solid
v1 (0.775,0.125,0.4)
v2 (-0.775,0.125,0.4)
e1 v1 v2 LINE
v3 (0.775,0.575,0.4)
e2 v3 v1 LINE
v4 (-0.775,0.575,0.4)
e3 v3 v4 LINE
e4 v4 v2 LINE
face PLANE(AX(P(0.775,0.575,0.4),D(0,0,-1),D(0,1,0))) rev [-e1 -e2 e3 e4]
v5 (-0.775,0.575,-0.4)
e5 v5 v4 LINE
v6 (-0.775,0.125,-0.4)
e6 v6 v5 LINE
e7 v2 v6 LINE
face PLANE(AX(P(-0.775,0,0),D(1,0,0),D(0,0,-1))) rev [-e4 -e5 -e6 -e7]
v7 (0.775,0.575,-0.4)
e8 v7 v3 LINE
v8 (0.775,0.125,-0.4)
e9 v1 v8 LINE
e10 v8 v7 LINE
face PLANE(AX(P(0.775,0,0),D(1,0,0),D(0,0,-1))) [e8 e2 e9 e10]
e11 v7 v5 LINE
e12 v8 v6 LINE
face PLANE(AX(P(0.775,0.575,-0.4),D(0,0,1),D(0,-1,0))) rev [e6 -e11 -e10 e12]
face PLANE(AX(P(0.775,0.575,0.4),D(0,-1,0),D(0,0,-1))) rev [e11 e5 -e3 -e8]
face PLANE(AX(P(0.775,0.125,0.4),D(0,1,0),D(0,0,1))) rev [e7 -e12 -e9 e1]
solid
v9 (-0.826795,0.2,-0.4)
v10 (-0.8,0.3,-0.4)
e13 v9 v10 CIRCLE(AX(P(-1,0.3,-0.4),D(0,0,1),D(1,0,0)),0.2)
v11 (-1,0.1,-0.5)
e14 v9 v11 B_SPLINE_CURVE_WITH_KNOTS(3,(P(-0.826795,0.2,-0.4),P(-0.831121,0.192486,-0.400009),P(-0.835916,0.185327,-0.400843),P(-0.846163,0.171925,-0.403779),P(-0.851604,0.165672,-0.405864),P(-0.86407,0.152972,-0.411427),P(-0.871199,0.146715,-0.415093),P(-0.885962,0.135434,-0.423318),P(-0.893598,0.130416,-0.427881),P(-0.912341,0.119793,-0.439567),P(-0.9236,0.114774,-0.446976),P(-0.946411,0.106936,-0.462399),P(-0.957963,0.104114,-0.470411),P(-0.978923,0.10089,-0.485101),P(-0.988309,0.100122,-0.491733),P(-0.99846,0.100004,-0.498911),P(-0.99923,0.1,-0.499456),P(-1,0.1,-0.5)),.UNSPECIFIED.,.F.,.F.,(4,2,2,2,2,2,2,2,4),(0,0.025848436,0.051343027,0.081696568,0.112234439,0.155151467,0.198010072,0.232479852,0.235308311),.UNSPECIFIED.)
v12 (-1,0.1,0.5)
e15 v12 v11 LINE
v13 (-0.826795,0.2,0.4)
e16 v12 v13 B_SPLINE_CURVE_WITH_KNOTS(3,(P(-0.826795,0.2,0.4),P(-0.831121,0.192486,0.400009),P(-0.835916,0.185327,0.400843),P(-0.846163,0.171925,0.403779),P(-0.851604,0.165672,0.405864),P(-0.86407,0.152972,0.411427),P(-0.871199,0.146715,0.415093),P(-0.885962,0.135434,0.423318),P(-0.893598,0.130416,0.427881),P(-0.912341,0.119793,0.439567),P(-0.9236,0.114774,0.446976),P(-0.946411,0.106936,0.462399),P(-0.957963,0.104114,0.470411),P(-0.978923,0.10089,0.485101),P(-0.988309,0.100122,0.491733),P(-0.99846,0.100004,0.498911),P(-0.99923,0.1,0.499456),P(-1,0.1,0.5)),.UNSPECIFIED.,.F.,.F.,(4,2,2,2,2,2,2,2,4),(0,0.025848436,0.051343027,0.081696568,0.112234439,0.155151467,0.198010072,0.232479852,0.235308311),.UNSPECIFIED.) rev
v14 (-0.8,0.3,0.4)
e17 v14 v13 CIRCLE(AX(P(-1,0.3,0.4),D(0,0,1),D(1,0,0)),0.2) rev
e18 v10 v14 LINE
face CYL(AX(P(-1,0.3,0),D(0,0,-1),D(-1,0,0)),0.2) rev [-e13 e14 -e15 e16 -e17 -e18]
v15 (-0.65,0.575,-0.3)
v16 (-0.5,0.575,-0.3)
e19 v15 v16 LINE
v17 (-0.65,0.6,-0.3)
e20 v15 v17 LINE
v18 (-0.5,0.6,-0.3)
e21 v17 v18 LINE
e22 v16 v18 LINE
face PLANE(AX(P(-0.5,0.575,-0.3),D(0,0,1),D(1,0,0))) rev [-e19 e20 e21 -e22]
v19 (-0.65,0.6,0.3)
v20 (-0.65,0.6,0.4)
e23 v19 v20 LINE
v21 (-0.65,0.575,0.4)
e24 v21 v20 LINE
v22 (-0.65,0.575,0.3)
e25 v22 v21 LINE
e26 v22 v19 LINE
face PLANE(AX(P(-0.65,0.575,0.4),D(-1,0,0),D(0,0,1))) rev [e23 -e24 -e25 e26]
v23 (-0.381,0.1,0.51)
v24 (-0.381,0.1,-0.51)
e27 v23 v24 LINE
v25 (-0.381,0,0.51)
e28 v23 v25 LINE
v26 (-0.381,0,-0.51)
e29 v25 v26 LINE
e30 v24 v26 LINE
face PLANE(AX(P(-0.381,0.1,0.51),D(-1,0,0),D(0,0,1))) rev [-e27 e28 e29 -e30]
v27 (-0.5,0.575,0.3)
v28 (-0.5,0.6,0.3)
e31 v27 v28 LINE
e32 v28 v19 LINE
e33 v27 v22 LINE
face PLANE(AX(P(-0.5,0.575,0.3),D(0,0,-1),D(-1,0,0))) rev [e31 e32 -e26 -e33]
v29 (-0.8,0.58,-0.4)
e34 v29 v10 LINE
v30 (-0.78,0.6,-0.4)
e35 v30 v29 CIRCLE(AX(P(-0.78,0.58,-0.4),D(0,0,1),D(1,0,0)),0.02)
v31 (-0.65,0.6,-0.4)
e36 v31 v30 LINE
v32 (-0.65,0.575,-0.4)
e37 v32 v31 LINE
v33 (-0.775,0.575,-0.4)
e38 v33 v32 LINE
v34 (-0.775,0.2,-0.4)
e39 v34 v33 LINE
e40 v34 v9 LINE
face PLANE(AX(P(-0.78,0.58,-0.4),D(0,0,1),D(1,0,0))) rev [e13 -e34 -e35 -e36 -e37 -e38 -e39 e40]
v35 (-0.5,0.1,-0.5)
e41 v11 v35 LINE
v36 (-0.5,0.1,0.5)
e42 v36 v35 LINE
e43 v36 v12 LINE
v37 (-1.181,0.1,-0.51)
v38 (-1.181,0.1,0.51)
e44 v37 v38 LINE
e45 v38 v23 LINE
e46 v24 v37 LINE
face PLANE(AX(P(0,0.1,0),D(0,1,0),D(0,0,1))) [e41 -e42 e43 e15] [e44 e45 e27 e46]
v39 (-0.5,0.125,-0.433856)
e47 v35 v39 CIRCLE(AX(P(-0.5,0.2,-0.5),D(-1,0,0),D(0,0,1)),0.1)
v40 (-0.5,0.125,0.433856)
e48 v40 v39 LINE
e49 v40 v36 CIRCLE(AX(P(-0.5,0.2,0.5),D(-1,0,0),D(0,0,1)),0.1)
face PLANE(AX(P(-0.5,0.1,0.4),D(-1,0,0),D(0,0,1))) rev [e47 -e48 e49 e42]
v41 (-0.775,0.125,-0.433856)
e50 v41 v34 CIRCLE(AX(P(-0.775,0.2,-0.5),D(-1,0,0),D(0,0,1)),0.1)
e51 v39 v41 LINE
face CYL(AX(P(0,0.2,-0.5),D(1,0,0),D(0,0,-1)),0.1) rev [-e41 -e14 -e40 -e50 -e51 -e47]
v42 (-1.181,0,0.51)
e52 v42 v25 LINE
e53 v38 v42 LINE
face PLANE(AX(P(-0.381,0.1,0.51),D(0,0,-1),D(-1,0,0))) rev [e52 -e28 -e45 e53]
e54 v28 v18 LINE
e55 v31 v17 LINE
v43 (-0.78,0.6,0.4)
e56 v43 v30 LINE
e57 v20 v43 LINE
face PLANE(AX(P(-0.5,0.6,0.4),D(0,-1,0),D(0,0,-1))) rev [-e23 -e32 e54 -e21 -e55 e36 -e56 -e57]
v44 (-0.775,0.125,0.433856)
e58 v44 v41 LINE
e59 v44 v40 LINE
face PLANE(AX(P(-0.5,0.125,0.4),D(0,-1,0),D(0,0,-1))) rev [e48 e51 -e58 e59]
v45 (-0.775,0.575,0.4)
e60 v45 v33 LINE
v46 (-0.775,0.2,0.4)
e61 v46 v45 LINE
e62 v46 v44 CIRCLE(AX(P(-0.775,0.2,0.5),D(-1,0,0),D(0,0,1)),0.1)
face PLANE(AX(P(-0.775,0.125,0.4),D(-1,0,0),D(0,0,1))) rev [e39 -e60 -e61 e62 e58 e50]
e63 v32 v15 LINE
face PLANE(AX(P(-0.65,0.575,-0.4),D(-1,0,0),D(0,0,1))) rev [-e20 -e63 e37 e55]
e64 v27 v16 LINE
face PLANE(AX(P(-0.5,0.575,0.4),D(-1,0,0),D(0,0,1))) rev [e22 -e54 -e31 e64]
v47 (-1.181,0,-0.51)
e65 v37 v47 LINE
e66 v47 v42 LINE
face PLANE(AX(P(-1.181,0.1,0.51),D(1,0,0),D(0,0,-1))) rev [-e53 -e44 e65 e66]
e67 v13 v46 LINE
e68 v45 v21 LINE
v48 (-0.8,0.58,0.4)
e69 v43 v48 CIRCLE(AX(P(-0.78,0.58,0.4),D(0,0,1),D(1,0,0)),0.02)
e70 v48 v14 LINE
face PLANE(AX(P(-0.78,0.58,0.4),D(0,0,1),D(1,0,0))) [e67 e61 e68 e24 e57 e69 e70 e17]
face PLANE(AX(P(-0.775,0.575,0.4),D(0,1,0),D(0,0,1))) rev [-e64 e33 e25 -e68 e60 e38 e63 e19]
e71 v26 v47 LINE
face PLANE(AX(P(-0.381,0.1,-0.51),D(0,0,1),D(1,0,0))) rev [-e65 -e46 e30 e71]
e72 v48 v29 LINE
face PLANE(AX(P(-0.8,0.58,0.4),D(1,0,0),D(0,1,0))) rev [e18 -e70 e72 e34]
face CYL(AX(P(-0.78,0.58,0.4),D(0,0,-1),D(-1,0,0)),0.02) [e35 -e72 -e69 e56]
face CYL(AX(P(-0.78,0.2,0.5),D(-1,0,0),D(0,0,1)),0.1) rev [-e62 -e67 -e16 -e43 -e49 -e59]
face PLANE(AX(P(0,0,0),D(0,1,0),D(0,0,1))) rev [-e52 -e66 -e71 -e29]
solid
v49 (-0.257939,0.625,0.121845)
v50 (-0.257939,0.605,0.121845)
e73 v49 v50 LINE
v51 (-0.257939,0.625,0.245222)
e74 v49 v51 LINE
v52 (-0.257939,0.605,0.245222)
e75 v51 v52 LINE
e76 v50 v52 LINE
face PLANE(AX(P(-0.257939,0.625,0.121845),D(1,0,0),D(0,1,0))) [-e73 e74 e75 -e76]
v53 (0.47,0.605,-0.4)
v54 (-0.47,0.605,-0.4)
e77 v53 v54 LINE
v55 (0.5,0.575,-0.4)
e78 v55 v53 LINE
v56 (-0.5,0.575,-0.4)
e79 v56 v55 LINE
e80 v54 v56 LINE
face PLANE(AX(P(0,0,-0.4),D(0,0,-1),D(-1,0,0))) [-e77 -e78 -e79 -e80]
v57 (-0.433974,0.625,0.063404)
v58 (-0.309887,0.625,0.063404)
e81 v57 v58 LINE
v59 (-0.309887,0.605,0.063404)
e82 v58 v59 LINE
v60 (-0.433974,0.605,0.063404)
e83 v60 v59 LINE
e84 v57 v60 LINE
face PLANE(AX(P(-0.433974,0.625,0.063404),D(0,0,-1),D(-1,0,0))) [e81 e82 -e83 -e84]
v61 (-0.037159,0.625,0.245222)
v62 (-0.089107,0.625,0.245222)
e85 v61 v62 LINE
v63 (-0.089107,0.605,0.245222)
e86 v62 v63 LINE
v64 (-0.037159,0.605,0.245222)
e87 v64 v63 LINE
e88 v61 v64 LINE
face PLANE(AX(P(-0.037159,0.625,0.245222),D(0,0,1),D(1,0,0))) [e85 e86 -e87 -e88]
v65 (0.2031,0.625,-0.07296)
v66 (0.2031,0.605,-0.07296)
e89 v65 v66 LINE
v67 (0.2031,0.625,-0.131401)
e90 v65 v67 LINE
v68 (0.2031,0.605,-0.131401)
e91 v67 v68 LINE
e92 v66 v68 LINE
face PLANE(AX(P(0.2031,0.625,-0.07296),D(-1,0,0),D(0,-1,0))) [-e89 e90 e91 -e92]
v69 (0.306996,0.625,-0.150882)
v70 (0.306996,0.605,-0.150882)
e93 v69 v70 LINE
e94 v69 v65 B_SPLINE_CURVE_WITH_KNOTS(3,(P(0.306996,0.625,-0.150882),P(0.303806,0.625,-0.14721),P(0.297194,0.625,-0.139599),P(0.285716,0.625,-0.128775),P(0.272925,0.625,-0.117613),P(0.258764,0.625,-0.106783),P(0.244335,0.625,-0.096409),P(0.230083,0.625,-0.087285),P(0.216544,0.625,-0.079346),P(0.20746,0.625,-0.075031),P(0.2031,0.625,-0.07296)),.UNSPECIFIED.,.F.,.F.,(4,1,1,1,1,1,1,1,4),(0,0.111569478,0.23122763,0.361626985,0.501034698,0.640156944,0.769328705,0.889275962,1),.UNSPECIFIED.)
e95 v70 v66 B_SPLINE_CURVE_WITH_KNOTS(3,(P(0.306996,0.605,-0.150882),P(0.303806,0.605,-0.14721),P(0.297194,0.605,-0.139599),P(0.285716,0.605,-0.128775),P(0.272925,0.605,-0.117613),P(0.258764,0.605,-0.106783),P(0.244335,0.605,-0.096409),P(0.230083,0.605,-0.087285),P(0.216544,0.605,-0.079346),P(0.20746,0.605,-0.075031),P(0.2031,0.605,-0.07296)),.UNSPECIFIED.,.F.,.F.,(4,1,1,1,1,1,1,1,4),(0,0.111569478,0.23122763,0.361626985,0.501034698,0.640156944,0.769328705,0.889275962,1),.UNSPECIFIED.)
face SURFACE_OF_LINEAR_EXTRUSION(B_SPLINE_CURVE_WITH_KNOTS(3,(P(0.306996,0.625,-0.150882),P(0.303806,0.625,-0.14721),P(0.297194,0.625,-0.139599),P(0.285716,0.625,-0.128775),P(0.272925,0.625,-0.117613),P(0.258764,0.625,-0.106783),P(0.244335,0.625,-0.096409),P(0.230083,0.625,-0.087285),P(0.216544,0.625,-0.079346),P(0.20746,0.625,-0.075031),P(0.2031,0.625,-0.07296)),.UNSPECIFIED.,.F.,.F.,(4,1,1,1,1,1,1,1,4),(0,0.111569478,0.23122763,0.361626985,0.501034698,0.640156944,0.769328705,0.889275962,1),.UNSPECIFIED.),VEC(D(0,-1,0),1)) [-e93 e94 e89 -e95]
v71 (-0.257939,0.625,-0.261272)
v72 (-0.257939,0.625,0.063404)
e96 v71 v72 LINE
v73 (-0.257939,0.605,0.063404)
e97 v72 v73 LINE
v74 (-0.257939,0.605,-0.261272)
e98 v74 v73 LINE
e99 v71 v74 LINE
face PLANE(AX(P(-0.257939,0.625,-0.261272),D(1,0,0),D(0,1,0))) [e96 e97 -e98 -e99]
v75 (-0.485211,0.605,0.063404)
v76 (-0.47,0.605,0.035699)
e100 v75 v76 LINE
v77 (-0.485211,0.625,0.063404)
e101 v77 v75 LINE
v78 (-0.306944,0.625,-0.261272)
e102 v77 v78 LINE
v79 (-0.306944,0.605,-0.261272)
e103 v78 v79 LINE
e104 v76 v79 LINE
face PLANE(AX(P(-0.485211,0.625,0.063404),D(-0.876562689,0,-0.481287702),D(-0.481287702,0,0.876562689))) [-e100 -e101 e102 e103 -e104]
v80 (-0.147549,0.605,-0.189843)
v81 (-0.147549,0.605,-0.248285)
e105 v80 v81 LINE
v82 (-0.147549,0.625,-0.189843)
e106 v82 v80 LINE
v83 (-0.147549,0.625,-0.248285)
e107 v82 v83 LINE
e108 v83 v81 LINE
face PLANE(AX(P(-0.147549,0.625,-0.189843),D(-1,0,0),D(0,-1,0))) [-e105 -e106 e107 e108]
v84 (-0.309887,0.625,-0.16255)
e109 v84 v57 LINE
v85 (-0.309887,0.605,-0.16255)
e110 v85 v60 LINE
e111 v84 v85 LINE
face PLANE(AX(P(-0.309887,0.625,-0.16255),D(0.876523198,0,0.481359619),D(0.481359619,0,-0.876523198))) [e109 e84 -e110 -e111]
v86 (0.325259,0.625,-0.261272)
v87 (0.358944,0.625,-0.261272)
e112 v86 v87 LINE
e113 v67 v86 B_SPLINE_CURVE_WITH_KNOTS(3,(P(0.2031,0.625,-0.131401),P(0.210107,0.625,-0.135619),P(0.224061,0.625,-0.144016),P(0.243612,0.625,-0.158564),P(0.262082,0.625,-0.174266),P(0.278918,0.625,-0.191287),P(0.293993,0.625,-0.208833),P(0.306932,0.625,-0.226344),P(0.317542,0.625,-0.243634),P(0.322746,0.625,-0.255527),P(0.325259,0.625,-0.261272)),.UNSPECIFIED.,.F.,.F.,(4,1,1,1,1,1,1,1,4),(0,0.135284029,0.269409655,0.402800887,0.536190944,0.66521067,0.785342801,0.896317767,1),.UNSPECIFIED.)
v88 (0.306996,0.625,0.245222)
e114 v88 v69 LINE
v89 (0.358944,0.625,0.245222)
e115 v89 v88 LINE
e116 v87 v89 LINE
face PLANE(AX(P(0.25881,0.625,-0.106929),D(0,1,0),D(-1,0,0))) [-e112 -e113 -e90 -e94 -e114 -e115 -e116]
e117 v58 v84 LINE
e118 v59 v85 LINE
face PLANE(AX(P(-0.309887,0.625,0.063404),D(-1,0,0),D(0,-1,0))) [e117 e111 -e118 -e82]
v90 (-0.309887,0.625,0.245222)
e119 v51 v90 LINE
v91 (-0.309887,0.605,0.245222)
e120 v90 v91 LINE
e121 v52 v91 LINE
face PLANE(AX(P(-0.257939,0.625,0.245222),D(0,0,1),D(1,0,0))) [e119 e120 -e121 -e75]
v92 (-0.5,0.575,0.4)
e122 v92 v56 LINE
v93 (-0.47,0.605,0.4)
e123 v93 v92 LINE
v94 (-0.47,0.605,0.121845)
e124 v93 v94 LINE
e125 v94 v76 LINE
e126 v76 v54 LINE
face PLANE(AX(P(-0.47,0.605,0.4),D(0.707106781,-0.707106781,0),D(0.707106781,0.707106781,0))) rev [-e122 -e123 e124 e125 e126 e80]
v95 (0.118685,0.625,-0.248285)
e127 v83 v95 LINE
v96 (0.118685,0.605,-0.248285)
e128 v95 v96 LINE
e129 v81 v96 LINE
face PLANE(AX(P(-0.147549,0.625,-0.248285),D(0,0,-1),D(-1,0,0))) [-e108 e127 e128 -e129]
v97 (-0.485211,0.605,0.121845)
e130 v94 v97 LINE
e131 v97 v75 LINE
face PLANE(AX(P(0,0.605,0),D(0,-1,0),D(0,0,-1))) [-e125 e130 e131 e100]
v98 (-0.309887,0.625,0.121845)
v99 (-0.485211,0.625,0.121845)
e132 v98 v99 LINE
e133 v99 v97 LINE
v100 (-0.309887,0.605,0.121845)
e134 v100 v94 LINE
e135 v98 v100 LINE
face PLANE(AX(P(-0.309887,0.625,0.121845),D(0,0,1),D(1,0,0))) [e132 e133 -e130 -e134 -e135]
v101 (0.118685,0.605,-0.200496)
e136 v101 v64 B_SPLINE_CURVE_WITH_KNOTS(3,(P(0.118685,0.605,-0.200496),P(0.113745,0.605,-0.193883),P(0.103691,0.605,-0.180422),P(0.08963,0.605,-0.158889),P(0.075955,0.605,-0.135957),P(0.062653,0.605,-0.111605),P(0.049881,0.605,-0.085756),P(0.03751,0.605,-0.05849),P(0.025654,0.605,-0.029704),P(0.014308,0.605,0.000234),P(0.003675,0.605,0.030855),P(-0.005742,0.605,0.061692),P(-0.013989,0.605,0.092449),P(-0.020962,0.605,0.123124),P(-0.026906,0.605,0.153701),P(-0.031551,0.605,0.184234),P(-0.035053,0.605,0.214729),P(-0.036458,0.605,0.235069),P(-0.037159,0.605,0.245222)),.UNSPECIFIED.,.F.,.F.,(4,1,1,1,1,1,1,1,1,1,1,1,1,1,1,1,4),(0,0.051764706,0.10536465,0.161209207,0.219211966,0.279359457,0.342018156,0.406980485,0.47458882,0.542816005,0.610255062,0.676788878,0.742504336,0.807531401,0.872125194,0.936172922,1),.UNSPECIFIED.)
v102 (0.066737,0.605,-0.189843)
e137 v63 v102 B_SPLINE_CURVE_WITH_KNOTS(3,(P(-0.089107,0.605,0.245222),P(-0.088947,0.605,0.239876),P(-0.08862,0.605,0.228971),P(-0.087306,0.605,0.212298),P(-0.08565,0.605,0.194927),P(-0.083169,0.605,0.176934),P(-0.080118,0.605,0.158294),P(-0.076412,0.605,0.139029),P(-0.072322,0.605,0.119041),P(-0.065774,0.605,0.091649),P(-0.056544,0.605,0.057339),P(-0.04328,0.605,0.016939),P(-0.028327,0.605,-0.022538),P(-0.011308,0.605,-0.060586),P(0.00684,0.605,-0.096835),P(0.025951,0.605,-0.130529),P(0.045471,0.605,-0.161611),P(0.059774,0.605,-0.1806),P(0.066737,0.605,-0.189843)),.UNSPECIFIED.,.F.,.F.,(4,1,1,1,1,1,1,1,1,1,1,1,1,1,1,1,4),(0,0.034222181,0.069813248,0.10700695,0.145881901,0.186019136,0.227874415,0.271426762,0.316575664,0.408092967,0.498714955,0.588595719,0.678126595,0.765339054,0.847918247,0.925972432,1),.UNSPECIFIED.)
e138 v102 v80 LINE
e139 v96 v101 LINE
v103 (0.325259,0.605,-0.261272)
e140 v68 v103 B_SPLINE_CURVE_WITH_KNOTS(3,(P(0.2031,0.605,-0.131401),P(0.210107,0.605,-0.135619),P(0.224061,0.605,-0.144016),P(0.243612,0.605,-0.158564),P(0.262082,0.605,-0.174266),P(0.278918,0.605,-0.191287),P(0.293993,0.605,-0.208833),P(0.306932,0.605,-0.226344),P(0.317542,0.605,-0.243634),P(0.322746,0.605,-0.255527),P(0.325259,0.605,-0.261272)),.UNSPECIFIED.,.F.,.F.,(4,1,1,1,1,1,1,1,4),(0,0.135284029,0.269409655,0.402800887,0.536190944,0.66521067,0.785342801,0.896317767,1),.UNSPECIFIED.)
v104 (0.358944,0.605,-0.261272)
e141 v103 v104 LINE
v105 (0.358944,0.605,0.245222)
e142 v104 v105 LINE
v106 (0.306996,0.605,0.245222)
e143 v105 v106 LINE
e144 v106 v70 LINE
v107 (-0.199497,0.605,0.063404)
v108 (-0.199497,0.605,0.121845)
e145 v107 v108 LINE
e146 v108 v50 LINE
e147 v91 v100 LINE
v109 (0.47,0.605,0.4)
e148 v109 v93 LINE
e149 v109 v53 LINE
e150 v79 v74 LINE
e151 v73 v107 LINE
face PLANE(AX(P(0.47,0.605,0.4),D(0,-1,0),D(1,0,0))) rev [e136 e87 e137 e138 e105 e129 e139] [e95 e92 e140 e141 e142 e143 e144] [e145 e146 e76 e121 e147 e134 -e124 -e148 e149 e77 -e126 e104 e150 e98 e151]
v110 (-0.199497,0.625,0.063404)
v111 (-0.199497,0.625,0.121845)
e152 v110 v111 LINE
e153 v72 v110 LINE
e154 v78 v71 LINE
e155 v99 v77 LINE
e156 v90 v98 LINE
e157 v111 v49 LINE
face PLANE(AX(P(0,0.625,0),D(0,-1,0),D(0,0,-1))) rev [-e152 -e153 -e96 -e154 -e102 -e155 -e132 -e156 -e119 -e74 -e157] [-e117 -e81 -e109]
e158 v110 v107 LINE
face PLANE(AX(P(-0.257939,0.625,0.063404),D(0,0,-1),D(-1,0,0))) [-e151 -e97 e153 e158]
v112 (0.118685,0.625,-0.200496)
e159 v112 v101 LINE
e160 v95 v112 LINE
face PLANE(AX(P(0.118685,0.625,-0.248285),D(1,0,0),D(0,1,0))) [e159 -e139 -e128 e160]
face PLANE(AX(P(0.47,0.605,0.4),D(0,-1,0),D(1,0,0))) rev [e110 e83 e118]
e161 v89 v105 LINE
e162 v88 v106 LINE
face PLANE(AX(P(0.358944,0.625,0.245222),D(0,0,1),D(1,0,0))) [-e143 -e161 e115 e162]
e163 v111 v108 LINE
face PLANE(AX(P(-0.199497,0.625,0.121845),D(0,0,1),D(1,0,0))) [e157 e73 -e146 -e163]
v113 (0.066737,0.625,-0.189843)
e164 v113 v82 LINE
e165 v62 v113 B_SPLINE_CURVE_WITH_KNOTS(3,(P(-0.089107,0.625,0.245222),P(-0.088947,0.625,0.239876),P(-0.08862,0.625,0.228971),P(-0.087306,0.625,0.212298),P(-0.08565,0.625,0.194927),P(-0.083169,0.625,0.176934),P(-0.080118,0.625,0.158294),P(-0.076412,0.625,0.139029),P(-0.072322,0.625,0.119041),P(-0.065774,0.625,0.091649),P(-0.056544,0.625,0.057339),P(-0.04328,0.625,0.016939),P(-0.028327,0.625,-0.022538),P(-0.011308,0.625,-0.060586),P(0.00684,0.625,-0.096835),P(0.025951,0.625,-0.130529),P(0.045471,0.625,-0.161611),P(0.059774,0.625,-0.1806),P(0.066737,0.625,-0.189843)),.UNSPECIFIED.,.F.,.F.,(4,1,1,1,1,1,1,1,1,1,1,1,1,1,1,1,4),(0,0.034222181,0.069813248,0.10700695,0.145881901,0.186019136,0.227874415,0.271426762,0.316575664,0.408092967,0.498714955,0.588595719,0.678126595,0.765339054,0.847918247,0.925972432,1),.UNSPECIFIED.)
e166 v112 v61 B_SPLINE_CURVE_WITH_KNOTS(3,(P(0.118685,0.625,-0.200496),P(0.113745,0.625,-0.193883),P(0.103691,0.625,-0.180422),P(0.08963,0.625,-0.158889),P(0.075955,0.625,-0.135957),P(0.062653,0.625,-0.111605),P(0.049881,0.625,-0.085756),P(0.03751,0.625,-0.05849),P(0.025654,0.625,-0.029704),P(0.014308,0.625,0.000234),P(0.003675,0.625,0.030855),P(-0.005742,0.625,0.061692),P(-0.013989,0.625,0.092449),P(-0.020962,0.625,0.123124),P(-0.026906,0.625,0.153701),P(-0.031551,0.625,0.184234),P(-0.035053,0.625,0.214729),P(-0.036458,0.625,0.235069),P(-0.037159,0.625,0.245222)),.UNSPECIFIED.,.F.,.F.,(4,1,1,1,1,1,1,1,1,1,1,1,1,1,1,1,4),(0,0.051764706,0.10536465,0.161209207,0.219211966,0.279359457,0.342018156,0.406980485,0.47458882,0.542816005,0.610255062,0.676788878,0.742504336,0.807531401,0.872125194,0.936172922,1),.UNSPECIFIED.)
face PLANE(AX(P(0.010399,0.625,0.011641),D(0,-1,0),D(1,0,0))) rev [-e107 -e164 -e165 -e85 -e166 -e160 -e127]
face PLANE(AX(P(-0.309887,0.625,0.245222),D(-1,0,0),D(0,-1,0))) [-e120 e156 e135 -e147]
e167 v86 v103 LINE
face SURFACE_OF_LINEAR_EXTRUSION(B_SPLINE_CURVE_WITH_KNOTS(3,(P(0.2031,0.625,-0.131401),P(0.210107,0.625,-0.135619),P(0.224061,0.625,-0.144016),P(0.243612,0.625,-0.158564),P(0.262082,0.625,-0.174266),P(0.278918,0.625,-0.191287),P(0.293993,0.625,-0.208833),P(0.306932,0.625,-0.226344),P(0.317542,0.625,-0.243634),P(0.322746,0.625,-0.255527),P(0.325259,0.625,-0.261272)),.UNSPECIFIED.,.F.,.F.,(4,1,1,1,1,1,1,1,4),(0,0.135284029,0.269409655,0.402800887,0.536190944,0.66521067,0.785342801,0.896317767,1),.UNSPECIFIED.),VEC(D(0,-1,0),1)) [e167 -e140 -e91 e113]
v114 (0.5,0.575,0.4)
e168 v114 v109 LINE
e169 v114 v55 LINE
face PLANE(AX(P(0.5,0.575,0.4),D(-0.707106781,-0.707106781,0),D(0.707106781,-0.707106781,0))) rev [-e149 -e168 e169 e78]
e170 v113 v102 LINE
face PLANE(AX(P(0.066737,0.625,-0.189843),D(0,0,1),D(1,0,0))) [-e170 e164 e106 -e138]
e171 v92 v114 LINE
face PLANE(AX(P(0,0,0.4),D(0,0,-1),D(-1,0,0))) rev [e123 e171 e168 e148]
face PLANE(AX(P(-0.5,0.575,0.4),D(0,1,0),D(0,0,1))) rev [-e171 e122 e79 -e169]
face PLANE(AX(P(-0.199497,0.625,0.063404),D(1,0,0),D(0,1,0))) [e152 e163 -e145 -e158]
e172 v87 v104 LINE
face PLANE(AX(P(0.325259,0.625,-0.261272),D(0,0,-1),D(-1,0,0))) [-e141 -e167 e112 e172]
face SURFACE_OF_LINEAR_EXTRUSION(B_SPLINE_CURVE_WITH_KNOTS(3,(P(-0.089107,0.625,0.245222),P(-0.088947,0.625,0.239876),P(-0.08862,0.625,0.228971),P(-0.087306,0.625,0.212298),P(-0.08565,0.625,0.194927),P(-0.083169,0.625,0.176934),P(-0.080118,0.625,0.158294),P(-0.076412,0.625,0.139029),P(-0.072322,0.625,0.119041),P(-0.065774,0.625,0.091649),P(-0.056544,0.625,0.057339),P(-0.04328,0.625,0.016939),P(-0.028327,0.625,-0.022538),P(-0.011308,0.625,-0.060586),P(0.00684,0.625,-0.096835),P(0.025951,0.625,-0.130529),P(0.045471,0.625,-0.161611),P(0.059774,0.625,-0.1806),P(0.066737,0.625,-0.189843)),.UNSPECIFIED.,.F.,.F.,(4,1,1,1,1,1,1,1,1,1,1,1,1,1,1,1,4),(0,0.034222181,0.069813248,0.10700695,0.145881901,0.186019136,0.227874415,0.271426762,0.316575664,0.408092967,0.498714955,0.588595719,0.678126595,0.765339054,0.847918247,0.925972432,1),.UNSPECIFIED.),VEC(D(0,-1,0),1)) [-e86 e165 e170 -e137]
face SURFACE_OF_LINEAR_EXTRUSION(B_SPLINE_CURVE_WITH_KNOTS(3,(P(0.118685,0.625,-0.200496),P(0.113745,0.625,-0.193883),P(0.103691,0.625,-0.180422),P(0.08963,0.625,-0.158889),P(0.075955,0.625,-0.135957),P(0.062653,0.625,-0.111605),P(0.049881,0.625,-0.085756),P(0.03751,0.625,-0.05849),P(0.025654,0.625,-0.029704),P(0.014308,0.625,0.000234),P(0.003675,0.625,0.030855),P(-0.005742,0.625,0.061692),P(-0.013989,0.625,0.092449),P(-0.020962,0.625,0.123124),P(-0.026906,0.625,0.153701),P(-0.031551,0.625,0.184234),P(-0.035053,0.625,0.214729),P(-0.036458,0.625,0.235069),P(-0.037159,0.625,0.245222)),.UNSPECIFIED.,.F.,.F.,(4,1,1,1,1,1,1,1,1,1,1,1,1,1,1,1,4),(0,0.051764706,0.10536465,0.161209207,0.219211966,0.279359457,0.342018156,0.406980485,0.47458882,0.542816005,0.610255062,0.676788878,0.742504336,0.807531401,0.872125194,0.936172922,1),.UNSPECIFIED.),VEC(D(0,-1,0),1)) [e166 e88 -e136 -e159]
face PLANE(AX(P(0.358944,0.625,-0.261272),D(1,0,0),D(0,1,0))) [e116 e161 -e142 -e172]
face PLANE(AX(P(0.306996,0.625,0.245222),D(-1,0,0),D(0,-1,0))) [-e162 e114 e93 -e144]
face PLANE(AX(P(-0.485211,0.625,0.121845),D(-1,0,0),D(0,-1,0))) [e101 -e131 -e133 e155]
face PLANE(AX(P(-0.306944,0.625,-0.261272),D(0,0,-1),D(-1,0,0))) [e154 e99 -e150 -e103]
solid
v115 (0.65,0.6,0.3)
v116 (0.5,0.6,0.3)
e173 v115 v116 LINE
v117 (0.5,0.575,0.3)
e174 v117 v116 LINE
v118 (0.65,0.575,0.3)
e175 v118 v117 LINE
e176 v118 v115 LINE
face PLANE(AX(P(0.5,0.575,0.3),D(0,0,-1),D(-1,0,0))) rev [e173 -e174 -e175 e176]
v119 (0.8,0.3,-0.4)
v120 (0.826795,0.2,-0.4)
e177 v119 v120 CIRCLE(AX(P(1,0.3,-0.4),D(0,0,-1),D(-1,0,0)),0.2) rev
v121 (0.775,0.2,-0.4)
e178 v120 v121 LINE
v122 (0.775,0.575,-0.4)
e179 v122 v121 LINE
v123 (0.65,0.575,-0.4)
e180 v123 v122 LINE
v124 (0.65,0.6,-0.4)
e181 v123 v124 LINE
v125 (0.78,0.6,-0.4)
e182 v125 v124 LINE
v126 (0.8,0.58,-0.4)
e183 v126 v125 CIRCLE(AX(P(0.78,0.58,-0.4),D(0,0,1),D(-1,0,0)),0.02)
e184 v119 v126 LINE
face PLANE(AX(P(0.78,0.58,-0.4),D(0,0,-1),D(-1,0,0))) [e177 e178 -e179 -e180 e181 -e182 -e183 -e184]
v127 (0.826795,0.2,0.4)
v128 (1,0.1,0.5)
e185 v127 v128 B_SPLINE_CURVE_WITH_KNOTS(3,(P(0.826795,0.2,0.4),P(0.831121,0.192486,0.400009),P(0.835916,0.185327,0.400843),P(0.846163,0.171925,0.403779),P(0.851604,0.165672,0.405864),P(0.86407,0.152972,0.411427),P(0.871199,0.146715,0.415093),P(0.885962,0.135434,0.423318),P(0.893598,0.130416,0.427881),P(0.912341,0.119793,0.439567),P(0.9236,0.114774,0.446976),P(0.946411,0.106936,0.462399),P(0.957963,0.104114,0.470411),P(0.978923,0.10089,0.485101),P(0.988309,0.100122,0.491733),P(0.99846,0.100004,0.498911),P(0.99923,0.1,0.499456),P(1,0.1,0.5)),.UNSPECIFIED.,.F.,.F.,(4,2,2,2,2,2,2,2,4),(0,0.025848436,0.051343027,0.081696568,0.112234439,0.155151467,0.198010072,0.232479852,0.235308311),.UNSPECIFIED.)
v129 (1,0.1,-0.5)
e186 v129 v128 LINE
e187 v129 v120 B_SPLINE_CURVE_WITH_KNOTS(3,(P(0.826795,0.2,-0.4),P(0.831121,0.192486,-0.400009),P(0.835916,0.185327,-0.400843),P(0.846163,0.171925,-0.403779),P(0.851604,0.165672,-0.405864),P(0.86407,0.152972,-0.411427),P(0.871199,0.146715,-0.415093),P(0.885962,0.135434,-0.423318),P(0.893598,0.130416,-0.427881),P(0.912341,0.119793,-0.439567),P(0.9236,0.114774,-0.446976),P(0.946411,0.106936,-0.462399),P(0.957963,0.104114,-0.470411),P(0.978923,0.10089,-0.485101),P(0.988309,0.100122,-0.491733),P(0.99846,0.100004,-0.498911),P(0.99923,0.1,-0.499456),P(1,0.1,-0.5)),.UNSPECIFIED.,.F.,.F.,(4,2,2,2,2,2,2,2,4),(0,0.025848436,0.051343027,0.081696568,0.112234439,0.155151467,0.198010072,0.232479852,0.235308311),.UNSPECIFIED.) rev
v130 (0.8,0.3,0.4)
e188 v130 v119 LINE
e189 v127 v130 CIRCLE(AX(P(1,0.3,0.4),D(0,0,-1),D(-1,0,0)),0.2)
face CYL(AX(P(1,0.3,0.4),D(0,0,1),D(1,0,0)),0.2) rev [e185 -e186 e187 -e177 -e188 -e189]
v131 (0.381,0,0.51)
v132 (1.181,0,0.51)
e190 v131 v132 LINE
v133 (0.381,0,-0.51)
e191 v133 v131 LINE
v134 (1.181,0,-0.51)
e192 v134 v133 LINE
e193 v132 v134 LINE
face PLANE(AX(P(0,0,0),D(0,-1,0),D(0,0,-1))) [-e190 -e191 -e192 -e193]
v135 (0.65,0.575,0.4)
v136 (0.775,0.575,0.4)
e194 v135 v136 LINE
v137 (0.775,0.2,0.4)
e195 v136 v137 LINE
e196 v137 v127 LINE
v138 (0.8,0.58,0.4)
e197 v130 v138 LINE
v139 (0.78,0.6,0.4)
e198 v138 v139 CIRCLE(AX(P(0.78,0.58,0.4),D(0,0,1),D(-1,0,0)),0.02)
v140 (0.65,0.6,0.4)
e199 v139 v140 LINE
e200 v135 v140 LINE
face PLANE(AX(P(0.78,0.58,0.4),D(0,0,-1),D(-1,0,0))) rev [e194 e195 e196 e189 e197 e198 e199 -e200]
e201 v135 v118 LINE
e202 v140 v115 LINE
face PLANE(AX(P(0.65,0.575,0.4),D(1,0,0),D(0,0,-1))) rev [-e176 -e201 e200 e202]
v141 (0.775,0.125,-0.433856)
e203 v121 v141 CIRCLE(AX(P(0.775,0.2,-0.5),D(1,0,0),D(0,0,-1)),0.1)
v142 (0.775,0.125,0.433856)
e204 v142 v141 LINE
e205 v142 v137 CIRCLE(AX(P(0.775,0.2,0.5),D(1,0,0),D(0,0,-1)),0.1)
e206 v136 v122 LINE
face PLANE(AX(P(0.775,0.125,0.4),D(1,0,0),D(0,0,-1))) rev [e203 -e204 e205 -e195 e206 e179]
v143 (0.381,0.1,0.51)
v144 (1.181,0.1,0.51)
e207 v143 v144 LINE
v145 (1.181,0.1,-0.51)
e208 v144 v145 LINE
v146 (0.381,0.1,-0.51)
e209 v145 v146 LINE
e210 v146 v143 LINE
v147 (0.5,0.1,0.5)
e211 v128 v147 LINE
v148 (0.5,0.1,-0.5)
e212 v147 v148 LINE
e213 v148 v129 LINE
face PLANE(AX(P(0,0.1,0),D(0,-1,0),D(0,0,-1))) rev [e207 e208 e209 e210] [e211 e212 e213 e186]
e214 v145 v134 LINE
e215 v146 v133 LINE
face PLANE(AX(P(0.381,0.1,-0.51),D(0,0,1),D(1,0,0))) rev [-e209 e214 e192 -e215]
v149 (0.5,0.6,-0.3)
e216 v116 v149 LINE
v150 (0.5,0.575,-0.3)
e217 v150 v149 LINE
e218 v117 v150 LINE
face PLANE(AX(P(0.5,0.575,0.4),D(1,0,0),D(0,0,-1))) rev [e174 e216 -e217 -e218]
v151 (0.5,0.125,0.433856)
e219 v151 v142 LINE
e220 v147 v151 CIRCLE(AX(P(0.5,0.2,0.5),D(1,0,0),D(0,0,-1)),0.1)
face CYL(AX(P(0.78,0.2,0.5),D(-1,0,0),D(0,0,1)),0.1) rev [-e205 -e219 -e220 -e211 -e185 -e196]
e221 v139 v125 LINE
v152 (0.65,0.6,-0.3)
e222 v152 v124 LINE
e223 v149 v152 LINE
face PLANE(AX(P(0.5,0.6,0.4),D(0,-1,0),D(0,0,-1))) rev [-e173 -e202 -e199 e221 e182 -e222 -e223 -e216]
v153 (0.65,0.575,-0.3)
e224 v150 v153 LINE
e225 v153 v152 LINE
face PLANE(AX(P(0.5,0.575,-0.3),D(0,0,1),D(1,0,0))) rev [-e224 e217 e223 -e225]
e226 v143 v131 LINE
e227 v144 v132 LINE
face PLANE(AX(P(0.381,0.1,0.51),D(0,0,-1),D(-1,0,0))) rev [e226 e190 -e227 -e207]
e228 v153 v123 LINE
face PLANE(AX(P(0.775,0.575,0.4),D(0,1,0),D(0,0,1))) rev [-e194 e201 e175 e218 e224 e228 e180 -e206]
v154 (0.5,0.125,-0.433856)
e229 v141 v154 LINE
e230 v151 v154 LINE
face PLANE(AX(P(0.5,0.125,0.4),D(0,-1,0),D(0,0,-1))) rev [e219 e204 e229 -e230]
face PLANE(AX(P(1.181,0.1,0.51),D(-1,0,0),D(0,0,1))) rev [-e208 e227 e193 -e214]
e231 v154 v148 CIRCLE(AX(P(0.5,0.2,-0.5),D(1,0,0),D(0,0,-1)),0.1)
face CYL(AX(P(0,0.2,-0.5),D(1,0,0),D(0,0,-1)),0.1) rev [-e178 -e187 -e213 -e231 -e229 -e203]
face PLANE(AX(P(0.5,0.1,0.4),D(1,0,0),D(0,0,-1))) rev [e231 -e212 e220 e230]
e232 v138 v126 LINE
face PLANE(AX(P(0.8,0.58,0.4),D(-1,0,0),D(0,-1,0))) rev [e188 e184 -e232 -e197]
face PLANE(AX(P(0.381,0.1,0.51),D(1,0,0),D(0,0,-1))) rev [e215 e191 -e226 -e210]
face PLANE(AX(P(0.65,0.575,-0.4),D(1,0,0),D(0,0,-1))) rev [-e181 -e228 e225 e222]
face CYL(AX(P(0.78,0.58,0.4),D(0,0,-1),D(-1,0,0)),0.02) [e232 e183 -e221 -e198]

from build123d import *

# Parameters (mm, degrees)
SKETCH1_W             = 0.8
SKETCH1_H             = 0.45
BOSS_EXTRUDE1_DEPTH   = 0.775
BOSS_EXTRUDE2_DEPTH   = 0.4
BOSS_EXTRUDE2_2_DEPTH = 0.4
SKETCH3_W             = 0.15
SKETCH3_H             = 0.1
CUT_EXTRUDE1_DEPTH    = 0.025
BOSS_EXTRUDE3_DEPTH   = 0.4
SKETCH7_W             = 0.8
SKETCH7_H             = 1.02
BOSS_EXTRUDE5_DEPTH   = 0.1
FILLET3_R             = 0.2
FILLET4_R             = 0.2
FILLET5_R             = 0.1
FILLET6_R             = 0.1
BOSS_EXTRU_1_DEPTH    = 0.02


with BuildPart() as part:
    # Sketch1 → Boss-Extrude1 (new, symmetric)
    with BuildSketch(Plane(origin=(0, 0, 0), x_dir=(0, 0, -1), z_dir=(1, 0, 0))):
        with Locations((0, 0.35)):
            Rectangle(SKETCH1_W, SKETCH1_H)
    extrude(amount=BOSS_EXTRUDE1_DEPTH, both=True)


with BuildPart() as body_2:
    # Sketch2 → Boss-Extrude2 (new, symmetric)
    with BuildSketch(Plane.XY):
        with BuildLine():
            Line((-0.5, 0.6), (-0.78, 0.6))
            ThreePointArc((-0.78, 0.6), (-0.794142136, 0.594142136), (-0.8, 0.58))
            Line((-0.8, 0.58), (-0.8, 0.1))
            Line((-0.8, 0.1), (-0.5, 0.1))
            Line((-0.5, 0.1), (-0.5, 0.125))
            Line((-0.5, 0.125), (-0.775, 0.125))
            Line((-0.775, 0.125), (-0.775, 0.575))
            Line((-0.775, 0.575), (-0.5, 0.575))
            Line((-0.5, 0.575), (-0.5, 0.6))
        make_face()
    extrude(amount=BOSS_EXTRUDE2_DEPTH, both=True)


with BuildPart() as body_3:
    # Sketch2 → Boss-Extrude2 2 (new, symmetric)
    with BuildSketch(Plane.XY):
        with BuildLine():
            Line((0.5, 0.575), (0.5, 0.6))
            Line((0.5, 0.6), (0.78, 0.6))
            ThreePointArc((0.78, 0.6), (0.794142136, 0.594142136), (0.8, 0.58))
            Line((0.8, 0.58), (0.8, 0.1))
            Line((0.8, 0.1), (0.5, 0.1))
            Line((0.5, 0.1), (0.5, 0.125))
            Line((0.5, 0.125), (0.775, 0.125))
            Line((0.775, 0.125), (0.775, 0.575))
            Line((0.775, 0.575), (0.5, 0.575))
        make_face()
    extrude(amount=BOSS_EXTRUDE2_2_DEPTH, both=True)


with BuildPart() as cut_extrude1_tool:
    # Sketch3 → Cut-Extrude1 (new body)
    with BuildSketch(Plane(origin=(0, 0.6, 0), x_dir=(1, 0, 0), z_dir=(0, 1, 0))):
        with Locations((-0.575, 0.35)):
            Rectangle(SKETCH3_W, SKETCH3_H)
        with Locations((-0.575, -0.35)):
            Rectangle(SKETCH3_W, SKETCH3_H)
        with Locations((0.575, -0.35)):
            Rectangle(SKETCH3_W, SKETCH3_H)
        with Locations((0.575, 0.35)):
            Rectangle(SKETCH3_W, SKETCH3_H)
    extrude(amount=-CUT_EXTRUDE1_DEPTH)


with BuildPart() as body_2_1:
    add(body_2.part)

    # Cut-Extrude1: cut by cut_extrude1_tool
    add(cut_extrude1_tool.part, mode=Mode.SUBTRACT)



with BuildPart() as body_3_1:
    add(body_3.part)

    # Cut-Extrude1: cut by cut_extrude1_tool
    add(cut_extrude1_tool.part, mode=Mode.SUBTRACT)


with BuildPart() as body_4:
    # Sketch4 → Boss-Extrude3 (new, symmetric)
    with BuildSketch(Plane.XY):
        Polygon((-0.5, 0.575), (0.5, 0.575), (0.47, 0.605), (-0.47, 0.605), align=None)
    extrude(amount=BOSS_EXTRUDE3_DEPTH, both=True)

    # Esquisse2 → Boss.-Extru.1 (add)
    # profile 1 of 3: a face of its own
    with BuildSketch(Plane(origin=(0, 0.605, 0), x_dir=(1, 0, 0), z_dir=(0, 1, 0))):
        Polygon((-0.309886691, -0.245221888), (-0.309886691, -0.121845264), (-0.485211367, -0.121845264), (-0.485211367, -0.063403706), (-0.306944321, 0.261271619), (-0.257938639, 0.261271619), (-0.257938639, -0.063403706), (-0.199497081, -0.063403706), (-0.199497081, -0.121845264), (-0.257938639, -0.121845264), (-0.257938639, -0.245221888), align=None)
        Polygon((-0.309886691, -0.063403706), (-0.309886691, 0.162550028), (-0.433973542, -0.063403706), align=None, mode=Mode.SUBTRACT)
    # profile 2 of 3: a face of its own
    with BuildSketch(Plane(origin=(0, 0.605, 0), x_dir=(1, 0, 0), z_dir=(0, 1, 0))):
        with BuildLine():
            Line((-0.147549029, 0.189843048), (-0.147549029, 0.248284606))
            Line((-0.147549029, 0.248284606), (0.118684737, 0.248284606))
            Line((0.118684737, 0.248284606), (0.118684737, 0.200496457))
            add(Edge.make_bspline(
                [(0.118684737, 0.200496457), (0.11374506, 0.193883112), (0.103690577, 0.180421956), (0.089629665, 0.15888939), (0.075954824, 0.135956865), (0.062653235, 0.111604996), (0.049881166, 0.085755524), (0.037509723, 0.058489528), (0.02565439, 0.029704454), (0.014307924, -0.000233926), (0.003675417, -0.030854621), (-0.005742033, -0.061692329), (-0.013988634, -0.092449334), (-0.020962495, -0.123124227), (-0.026905964, -0.153701204), (-0.031550699, -0.184233606), (-0.035053075, -0.21472856), (-0.036458112, -0.235069144), (-0.037159418, -0.245221888)],
                knots=[0, 0, 0, 0, 0.828235292, 1.685834407, 2.579347319, 3.50739146, 4.469751317, 5.472290501, 6.511687755, 7.593421113, 8.685056077, 9.764080991, 10.828622054, 11.880069368, 12.920502423, 13.954003105, 14.978766756, 16, 16, 16, 16], degree=3))
            Line((-0.037159418, -0.245221888), (-0.08910747, -0.245221888))
            add(Edge.make_bspline(
                [(-0.08910747, -0.245221888), (-0.088946966, -0.239876054), (-0.088619538, -0.228970553), (-0.087305949, -0.2122975), (-0.085650055, -0.194926574), (-0.083168557, -0.176934464), (-0.080118357, -0.158294079), (-0.076411626, -0.13902896), (-0.072322113, -0.11904052), (-0.065773685, -0.091649168), (-0.056543919, -0.057339348), (-0.043279746, -0.016938754), (-0.028326509, 0.022538381), (-0.011308019, 0.060586243), (0.006839864, 0.096834643), (0.025951357, 0.13052881), (0.045471344, 0.161610603), (0.059774471, 0.180599823), (0.066736685, 0.189843048)],
                knots=[0, 0, 0, 0, 0.54755489, 1.117011975, 1.712111195, 2.334110413, 2.976306168, 3.645990646, 4.342828197, 5.06521062, 6.529487471, 7.979439287, 9.417531512, 10.850025522, 12.245424871, 13.566691952, 14.815558909, 16, 16, 16, 16], degree=3))
            Line((0.066736685, 0.189843048), (-0.147549029, 0.189843048))
        make_face()
    # profile 3 of 3: a face of its own
    with BuildSketch(Plane(origin=(0, 0.605, 0), x_dir=(1, 0, 0), z_dir=(0, 1, 0))):
        with BuildLine():
            Line((0.358944478, -0.245221888), (0.306996426, -0.245221888))
            Line((0.306996426, -0.245221888), (0.306996426, 0.150882009))
            add(Edge.make_bspline(
                [(0.306996426, 0.150882009), (0.303806106, 0.147209677), (0.297194172, 0.139598774), (0.285716194, 0.128775009), (0.272925255, 0.1176135), (0.258763988, 0.106782892), (0.244334784, 0.096408923), (0.230083263, 0.087284837), (0.216543567, 0.079346193), (0.207460341, 0.075031174), (0.203100322, 0.072959931)],
                knots=[0, 0, 0, 0, 0.892555828, 1.849821039, 2.893015883, 4.008277588, 5.121255548, 6.154629642, 7.114207698, 8, 8, 8, 8], degree=3))
            Line((0.203100322, 0.072959931), (0.203100322, 0.131401489))
            add(Edge.make_bspline(
                [(0.203100322, 0.131401489), (0.210107225, 0.13561851), (0.224061033, 0.144016443), (0.243612145, 0.158564375), (0.262081827, 0.174266475), (0.278918027, 0.191287267), (0.293992994, 0.208833156), (0.306932185, 0.226343975), (0.317541502, 0.243633673), (0.322745711, 0.255526991), (0.325259413, 0.261271619)],
                knots=[0, 0, 0, 0, 1.082272232, 2.155277244, 3.222407096, 4.289527553, 5.32168536, 6.282742408, 7.170542132, 8, 8, 8, 8], degree=3))
            Line((0.325259413, 0.261271619), (0.358944478, 0.261271619))
            Line((0.358944478, 0.261271619), (0.358944478, -0.245221888))
        make_face()
    extrude(amount=BOSS_EXTRU_1_DEPTH)


with BuildPart() as body_2_2:
    add(body_2_1.part)

    add(body_3_1.part)  # Boss-Extrude5 merges body 3
    # Sketch7 → Boss-Extrude5 (add)
    with BuildSketch(Plane(origin=(0, 0, 0), x_dir=(1, 0, 0), z_dir=(0, 1, 0))):
        with Locations((-0.781, 0)):
            Rectangle(SKETCH7_W, SKETCH7_H)
        with Locations((0.781, 0)):
            Rectangle(SKETCH7_W, SKETCH7_H)
    extrude(amount=BOSS_EXTRUDE5_DEPTH)

    # Fillet3
    fillet3_edges = [body_2_2.edges().sort_by_distance(p)[0] for p in [
        (-0.8, 0.1, 0),
    ]]
    fillet(fillet3_edges, radius=FILLET3_R)

    # Fillet4
    fillet4_edges = [body_2_2.edges().sort_by_distance(p)[0] for p in [
        (0.8, 0.1, 0),
    ]]
    fillet(fillet4_edges, radius=FILLET4_R)

    # Fillet5
    fillet5_edges = [body_2_2.edges().sort_by_distance(p)[0] for p in [
        (0.75, 0.1, 0.4),
    ]]
    fillet(fillet5_edges, radius=FILLET5_R)
    fillet5_2_edges = [body_2_2.edges().sort_by_distance(p)[0] for p in [
        (0.75, 0.1, -0.4),
    ]]
    fillet(fillet5_2_edges, radius=FILLET5_R)

    # Fillet6
    fillet6_edges = [body_2_2.edges().sort_by_distance(p)[0] for p in [
        (-0.75, 0.1, -0.4),
    ]]
    fillet(fillet6_edges, radius=FILLET6_R)
    fillet6_2_edges = [body_2_2.edges().sort_by_distance(p)[0] for p in [
        (-0.75, 0.1, 0.4),
    ]]
    fillet(fillet6_2_edges, radius=FILLET6_R)


solid = Compound([part.part, body_4.part, body_2_2.part])
